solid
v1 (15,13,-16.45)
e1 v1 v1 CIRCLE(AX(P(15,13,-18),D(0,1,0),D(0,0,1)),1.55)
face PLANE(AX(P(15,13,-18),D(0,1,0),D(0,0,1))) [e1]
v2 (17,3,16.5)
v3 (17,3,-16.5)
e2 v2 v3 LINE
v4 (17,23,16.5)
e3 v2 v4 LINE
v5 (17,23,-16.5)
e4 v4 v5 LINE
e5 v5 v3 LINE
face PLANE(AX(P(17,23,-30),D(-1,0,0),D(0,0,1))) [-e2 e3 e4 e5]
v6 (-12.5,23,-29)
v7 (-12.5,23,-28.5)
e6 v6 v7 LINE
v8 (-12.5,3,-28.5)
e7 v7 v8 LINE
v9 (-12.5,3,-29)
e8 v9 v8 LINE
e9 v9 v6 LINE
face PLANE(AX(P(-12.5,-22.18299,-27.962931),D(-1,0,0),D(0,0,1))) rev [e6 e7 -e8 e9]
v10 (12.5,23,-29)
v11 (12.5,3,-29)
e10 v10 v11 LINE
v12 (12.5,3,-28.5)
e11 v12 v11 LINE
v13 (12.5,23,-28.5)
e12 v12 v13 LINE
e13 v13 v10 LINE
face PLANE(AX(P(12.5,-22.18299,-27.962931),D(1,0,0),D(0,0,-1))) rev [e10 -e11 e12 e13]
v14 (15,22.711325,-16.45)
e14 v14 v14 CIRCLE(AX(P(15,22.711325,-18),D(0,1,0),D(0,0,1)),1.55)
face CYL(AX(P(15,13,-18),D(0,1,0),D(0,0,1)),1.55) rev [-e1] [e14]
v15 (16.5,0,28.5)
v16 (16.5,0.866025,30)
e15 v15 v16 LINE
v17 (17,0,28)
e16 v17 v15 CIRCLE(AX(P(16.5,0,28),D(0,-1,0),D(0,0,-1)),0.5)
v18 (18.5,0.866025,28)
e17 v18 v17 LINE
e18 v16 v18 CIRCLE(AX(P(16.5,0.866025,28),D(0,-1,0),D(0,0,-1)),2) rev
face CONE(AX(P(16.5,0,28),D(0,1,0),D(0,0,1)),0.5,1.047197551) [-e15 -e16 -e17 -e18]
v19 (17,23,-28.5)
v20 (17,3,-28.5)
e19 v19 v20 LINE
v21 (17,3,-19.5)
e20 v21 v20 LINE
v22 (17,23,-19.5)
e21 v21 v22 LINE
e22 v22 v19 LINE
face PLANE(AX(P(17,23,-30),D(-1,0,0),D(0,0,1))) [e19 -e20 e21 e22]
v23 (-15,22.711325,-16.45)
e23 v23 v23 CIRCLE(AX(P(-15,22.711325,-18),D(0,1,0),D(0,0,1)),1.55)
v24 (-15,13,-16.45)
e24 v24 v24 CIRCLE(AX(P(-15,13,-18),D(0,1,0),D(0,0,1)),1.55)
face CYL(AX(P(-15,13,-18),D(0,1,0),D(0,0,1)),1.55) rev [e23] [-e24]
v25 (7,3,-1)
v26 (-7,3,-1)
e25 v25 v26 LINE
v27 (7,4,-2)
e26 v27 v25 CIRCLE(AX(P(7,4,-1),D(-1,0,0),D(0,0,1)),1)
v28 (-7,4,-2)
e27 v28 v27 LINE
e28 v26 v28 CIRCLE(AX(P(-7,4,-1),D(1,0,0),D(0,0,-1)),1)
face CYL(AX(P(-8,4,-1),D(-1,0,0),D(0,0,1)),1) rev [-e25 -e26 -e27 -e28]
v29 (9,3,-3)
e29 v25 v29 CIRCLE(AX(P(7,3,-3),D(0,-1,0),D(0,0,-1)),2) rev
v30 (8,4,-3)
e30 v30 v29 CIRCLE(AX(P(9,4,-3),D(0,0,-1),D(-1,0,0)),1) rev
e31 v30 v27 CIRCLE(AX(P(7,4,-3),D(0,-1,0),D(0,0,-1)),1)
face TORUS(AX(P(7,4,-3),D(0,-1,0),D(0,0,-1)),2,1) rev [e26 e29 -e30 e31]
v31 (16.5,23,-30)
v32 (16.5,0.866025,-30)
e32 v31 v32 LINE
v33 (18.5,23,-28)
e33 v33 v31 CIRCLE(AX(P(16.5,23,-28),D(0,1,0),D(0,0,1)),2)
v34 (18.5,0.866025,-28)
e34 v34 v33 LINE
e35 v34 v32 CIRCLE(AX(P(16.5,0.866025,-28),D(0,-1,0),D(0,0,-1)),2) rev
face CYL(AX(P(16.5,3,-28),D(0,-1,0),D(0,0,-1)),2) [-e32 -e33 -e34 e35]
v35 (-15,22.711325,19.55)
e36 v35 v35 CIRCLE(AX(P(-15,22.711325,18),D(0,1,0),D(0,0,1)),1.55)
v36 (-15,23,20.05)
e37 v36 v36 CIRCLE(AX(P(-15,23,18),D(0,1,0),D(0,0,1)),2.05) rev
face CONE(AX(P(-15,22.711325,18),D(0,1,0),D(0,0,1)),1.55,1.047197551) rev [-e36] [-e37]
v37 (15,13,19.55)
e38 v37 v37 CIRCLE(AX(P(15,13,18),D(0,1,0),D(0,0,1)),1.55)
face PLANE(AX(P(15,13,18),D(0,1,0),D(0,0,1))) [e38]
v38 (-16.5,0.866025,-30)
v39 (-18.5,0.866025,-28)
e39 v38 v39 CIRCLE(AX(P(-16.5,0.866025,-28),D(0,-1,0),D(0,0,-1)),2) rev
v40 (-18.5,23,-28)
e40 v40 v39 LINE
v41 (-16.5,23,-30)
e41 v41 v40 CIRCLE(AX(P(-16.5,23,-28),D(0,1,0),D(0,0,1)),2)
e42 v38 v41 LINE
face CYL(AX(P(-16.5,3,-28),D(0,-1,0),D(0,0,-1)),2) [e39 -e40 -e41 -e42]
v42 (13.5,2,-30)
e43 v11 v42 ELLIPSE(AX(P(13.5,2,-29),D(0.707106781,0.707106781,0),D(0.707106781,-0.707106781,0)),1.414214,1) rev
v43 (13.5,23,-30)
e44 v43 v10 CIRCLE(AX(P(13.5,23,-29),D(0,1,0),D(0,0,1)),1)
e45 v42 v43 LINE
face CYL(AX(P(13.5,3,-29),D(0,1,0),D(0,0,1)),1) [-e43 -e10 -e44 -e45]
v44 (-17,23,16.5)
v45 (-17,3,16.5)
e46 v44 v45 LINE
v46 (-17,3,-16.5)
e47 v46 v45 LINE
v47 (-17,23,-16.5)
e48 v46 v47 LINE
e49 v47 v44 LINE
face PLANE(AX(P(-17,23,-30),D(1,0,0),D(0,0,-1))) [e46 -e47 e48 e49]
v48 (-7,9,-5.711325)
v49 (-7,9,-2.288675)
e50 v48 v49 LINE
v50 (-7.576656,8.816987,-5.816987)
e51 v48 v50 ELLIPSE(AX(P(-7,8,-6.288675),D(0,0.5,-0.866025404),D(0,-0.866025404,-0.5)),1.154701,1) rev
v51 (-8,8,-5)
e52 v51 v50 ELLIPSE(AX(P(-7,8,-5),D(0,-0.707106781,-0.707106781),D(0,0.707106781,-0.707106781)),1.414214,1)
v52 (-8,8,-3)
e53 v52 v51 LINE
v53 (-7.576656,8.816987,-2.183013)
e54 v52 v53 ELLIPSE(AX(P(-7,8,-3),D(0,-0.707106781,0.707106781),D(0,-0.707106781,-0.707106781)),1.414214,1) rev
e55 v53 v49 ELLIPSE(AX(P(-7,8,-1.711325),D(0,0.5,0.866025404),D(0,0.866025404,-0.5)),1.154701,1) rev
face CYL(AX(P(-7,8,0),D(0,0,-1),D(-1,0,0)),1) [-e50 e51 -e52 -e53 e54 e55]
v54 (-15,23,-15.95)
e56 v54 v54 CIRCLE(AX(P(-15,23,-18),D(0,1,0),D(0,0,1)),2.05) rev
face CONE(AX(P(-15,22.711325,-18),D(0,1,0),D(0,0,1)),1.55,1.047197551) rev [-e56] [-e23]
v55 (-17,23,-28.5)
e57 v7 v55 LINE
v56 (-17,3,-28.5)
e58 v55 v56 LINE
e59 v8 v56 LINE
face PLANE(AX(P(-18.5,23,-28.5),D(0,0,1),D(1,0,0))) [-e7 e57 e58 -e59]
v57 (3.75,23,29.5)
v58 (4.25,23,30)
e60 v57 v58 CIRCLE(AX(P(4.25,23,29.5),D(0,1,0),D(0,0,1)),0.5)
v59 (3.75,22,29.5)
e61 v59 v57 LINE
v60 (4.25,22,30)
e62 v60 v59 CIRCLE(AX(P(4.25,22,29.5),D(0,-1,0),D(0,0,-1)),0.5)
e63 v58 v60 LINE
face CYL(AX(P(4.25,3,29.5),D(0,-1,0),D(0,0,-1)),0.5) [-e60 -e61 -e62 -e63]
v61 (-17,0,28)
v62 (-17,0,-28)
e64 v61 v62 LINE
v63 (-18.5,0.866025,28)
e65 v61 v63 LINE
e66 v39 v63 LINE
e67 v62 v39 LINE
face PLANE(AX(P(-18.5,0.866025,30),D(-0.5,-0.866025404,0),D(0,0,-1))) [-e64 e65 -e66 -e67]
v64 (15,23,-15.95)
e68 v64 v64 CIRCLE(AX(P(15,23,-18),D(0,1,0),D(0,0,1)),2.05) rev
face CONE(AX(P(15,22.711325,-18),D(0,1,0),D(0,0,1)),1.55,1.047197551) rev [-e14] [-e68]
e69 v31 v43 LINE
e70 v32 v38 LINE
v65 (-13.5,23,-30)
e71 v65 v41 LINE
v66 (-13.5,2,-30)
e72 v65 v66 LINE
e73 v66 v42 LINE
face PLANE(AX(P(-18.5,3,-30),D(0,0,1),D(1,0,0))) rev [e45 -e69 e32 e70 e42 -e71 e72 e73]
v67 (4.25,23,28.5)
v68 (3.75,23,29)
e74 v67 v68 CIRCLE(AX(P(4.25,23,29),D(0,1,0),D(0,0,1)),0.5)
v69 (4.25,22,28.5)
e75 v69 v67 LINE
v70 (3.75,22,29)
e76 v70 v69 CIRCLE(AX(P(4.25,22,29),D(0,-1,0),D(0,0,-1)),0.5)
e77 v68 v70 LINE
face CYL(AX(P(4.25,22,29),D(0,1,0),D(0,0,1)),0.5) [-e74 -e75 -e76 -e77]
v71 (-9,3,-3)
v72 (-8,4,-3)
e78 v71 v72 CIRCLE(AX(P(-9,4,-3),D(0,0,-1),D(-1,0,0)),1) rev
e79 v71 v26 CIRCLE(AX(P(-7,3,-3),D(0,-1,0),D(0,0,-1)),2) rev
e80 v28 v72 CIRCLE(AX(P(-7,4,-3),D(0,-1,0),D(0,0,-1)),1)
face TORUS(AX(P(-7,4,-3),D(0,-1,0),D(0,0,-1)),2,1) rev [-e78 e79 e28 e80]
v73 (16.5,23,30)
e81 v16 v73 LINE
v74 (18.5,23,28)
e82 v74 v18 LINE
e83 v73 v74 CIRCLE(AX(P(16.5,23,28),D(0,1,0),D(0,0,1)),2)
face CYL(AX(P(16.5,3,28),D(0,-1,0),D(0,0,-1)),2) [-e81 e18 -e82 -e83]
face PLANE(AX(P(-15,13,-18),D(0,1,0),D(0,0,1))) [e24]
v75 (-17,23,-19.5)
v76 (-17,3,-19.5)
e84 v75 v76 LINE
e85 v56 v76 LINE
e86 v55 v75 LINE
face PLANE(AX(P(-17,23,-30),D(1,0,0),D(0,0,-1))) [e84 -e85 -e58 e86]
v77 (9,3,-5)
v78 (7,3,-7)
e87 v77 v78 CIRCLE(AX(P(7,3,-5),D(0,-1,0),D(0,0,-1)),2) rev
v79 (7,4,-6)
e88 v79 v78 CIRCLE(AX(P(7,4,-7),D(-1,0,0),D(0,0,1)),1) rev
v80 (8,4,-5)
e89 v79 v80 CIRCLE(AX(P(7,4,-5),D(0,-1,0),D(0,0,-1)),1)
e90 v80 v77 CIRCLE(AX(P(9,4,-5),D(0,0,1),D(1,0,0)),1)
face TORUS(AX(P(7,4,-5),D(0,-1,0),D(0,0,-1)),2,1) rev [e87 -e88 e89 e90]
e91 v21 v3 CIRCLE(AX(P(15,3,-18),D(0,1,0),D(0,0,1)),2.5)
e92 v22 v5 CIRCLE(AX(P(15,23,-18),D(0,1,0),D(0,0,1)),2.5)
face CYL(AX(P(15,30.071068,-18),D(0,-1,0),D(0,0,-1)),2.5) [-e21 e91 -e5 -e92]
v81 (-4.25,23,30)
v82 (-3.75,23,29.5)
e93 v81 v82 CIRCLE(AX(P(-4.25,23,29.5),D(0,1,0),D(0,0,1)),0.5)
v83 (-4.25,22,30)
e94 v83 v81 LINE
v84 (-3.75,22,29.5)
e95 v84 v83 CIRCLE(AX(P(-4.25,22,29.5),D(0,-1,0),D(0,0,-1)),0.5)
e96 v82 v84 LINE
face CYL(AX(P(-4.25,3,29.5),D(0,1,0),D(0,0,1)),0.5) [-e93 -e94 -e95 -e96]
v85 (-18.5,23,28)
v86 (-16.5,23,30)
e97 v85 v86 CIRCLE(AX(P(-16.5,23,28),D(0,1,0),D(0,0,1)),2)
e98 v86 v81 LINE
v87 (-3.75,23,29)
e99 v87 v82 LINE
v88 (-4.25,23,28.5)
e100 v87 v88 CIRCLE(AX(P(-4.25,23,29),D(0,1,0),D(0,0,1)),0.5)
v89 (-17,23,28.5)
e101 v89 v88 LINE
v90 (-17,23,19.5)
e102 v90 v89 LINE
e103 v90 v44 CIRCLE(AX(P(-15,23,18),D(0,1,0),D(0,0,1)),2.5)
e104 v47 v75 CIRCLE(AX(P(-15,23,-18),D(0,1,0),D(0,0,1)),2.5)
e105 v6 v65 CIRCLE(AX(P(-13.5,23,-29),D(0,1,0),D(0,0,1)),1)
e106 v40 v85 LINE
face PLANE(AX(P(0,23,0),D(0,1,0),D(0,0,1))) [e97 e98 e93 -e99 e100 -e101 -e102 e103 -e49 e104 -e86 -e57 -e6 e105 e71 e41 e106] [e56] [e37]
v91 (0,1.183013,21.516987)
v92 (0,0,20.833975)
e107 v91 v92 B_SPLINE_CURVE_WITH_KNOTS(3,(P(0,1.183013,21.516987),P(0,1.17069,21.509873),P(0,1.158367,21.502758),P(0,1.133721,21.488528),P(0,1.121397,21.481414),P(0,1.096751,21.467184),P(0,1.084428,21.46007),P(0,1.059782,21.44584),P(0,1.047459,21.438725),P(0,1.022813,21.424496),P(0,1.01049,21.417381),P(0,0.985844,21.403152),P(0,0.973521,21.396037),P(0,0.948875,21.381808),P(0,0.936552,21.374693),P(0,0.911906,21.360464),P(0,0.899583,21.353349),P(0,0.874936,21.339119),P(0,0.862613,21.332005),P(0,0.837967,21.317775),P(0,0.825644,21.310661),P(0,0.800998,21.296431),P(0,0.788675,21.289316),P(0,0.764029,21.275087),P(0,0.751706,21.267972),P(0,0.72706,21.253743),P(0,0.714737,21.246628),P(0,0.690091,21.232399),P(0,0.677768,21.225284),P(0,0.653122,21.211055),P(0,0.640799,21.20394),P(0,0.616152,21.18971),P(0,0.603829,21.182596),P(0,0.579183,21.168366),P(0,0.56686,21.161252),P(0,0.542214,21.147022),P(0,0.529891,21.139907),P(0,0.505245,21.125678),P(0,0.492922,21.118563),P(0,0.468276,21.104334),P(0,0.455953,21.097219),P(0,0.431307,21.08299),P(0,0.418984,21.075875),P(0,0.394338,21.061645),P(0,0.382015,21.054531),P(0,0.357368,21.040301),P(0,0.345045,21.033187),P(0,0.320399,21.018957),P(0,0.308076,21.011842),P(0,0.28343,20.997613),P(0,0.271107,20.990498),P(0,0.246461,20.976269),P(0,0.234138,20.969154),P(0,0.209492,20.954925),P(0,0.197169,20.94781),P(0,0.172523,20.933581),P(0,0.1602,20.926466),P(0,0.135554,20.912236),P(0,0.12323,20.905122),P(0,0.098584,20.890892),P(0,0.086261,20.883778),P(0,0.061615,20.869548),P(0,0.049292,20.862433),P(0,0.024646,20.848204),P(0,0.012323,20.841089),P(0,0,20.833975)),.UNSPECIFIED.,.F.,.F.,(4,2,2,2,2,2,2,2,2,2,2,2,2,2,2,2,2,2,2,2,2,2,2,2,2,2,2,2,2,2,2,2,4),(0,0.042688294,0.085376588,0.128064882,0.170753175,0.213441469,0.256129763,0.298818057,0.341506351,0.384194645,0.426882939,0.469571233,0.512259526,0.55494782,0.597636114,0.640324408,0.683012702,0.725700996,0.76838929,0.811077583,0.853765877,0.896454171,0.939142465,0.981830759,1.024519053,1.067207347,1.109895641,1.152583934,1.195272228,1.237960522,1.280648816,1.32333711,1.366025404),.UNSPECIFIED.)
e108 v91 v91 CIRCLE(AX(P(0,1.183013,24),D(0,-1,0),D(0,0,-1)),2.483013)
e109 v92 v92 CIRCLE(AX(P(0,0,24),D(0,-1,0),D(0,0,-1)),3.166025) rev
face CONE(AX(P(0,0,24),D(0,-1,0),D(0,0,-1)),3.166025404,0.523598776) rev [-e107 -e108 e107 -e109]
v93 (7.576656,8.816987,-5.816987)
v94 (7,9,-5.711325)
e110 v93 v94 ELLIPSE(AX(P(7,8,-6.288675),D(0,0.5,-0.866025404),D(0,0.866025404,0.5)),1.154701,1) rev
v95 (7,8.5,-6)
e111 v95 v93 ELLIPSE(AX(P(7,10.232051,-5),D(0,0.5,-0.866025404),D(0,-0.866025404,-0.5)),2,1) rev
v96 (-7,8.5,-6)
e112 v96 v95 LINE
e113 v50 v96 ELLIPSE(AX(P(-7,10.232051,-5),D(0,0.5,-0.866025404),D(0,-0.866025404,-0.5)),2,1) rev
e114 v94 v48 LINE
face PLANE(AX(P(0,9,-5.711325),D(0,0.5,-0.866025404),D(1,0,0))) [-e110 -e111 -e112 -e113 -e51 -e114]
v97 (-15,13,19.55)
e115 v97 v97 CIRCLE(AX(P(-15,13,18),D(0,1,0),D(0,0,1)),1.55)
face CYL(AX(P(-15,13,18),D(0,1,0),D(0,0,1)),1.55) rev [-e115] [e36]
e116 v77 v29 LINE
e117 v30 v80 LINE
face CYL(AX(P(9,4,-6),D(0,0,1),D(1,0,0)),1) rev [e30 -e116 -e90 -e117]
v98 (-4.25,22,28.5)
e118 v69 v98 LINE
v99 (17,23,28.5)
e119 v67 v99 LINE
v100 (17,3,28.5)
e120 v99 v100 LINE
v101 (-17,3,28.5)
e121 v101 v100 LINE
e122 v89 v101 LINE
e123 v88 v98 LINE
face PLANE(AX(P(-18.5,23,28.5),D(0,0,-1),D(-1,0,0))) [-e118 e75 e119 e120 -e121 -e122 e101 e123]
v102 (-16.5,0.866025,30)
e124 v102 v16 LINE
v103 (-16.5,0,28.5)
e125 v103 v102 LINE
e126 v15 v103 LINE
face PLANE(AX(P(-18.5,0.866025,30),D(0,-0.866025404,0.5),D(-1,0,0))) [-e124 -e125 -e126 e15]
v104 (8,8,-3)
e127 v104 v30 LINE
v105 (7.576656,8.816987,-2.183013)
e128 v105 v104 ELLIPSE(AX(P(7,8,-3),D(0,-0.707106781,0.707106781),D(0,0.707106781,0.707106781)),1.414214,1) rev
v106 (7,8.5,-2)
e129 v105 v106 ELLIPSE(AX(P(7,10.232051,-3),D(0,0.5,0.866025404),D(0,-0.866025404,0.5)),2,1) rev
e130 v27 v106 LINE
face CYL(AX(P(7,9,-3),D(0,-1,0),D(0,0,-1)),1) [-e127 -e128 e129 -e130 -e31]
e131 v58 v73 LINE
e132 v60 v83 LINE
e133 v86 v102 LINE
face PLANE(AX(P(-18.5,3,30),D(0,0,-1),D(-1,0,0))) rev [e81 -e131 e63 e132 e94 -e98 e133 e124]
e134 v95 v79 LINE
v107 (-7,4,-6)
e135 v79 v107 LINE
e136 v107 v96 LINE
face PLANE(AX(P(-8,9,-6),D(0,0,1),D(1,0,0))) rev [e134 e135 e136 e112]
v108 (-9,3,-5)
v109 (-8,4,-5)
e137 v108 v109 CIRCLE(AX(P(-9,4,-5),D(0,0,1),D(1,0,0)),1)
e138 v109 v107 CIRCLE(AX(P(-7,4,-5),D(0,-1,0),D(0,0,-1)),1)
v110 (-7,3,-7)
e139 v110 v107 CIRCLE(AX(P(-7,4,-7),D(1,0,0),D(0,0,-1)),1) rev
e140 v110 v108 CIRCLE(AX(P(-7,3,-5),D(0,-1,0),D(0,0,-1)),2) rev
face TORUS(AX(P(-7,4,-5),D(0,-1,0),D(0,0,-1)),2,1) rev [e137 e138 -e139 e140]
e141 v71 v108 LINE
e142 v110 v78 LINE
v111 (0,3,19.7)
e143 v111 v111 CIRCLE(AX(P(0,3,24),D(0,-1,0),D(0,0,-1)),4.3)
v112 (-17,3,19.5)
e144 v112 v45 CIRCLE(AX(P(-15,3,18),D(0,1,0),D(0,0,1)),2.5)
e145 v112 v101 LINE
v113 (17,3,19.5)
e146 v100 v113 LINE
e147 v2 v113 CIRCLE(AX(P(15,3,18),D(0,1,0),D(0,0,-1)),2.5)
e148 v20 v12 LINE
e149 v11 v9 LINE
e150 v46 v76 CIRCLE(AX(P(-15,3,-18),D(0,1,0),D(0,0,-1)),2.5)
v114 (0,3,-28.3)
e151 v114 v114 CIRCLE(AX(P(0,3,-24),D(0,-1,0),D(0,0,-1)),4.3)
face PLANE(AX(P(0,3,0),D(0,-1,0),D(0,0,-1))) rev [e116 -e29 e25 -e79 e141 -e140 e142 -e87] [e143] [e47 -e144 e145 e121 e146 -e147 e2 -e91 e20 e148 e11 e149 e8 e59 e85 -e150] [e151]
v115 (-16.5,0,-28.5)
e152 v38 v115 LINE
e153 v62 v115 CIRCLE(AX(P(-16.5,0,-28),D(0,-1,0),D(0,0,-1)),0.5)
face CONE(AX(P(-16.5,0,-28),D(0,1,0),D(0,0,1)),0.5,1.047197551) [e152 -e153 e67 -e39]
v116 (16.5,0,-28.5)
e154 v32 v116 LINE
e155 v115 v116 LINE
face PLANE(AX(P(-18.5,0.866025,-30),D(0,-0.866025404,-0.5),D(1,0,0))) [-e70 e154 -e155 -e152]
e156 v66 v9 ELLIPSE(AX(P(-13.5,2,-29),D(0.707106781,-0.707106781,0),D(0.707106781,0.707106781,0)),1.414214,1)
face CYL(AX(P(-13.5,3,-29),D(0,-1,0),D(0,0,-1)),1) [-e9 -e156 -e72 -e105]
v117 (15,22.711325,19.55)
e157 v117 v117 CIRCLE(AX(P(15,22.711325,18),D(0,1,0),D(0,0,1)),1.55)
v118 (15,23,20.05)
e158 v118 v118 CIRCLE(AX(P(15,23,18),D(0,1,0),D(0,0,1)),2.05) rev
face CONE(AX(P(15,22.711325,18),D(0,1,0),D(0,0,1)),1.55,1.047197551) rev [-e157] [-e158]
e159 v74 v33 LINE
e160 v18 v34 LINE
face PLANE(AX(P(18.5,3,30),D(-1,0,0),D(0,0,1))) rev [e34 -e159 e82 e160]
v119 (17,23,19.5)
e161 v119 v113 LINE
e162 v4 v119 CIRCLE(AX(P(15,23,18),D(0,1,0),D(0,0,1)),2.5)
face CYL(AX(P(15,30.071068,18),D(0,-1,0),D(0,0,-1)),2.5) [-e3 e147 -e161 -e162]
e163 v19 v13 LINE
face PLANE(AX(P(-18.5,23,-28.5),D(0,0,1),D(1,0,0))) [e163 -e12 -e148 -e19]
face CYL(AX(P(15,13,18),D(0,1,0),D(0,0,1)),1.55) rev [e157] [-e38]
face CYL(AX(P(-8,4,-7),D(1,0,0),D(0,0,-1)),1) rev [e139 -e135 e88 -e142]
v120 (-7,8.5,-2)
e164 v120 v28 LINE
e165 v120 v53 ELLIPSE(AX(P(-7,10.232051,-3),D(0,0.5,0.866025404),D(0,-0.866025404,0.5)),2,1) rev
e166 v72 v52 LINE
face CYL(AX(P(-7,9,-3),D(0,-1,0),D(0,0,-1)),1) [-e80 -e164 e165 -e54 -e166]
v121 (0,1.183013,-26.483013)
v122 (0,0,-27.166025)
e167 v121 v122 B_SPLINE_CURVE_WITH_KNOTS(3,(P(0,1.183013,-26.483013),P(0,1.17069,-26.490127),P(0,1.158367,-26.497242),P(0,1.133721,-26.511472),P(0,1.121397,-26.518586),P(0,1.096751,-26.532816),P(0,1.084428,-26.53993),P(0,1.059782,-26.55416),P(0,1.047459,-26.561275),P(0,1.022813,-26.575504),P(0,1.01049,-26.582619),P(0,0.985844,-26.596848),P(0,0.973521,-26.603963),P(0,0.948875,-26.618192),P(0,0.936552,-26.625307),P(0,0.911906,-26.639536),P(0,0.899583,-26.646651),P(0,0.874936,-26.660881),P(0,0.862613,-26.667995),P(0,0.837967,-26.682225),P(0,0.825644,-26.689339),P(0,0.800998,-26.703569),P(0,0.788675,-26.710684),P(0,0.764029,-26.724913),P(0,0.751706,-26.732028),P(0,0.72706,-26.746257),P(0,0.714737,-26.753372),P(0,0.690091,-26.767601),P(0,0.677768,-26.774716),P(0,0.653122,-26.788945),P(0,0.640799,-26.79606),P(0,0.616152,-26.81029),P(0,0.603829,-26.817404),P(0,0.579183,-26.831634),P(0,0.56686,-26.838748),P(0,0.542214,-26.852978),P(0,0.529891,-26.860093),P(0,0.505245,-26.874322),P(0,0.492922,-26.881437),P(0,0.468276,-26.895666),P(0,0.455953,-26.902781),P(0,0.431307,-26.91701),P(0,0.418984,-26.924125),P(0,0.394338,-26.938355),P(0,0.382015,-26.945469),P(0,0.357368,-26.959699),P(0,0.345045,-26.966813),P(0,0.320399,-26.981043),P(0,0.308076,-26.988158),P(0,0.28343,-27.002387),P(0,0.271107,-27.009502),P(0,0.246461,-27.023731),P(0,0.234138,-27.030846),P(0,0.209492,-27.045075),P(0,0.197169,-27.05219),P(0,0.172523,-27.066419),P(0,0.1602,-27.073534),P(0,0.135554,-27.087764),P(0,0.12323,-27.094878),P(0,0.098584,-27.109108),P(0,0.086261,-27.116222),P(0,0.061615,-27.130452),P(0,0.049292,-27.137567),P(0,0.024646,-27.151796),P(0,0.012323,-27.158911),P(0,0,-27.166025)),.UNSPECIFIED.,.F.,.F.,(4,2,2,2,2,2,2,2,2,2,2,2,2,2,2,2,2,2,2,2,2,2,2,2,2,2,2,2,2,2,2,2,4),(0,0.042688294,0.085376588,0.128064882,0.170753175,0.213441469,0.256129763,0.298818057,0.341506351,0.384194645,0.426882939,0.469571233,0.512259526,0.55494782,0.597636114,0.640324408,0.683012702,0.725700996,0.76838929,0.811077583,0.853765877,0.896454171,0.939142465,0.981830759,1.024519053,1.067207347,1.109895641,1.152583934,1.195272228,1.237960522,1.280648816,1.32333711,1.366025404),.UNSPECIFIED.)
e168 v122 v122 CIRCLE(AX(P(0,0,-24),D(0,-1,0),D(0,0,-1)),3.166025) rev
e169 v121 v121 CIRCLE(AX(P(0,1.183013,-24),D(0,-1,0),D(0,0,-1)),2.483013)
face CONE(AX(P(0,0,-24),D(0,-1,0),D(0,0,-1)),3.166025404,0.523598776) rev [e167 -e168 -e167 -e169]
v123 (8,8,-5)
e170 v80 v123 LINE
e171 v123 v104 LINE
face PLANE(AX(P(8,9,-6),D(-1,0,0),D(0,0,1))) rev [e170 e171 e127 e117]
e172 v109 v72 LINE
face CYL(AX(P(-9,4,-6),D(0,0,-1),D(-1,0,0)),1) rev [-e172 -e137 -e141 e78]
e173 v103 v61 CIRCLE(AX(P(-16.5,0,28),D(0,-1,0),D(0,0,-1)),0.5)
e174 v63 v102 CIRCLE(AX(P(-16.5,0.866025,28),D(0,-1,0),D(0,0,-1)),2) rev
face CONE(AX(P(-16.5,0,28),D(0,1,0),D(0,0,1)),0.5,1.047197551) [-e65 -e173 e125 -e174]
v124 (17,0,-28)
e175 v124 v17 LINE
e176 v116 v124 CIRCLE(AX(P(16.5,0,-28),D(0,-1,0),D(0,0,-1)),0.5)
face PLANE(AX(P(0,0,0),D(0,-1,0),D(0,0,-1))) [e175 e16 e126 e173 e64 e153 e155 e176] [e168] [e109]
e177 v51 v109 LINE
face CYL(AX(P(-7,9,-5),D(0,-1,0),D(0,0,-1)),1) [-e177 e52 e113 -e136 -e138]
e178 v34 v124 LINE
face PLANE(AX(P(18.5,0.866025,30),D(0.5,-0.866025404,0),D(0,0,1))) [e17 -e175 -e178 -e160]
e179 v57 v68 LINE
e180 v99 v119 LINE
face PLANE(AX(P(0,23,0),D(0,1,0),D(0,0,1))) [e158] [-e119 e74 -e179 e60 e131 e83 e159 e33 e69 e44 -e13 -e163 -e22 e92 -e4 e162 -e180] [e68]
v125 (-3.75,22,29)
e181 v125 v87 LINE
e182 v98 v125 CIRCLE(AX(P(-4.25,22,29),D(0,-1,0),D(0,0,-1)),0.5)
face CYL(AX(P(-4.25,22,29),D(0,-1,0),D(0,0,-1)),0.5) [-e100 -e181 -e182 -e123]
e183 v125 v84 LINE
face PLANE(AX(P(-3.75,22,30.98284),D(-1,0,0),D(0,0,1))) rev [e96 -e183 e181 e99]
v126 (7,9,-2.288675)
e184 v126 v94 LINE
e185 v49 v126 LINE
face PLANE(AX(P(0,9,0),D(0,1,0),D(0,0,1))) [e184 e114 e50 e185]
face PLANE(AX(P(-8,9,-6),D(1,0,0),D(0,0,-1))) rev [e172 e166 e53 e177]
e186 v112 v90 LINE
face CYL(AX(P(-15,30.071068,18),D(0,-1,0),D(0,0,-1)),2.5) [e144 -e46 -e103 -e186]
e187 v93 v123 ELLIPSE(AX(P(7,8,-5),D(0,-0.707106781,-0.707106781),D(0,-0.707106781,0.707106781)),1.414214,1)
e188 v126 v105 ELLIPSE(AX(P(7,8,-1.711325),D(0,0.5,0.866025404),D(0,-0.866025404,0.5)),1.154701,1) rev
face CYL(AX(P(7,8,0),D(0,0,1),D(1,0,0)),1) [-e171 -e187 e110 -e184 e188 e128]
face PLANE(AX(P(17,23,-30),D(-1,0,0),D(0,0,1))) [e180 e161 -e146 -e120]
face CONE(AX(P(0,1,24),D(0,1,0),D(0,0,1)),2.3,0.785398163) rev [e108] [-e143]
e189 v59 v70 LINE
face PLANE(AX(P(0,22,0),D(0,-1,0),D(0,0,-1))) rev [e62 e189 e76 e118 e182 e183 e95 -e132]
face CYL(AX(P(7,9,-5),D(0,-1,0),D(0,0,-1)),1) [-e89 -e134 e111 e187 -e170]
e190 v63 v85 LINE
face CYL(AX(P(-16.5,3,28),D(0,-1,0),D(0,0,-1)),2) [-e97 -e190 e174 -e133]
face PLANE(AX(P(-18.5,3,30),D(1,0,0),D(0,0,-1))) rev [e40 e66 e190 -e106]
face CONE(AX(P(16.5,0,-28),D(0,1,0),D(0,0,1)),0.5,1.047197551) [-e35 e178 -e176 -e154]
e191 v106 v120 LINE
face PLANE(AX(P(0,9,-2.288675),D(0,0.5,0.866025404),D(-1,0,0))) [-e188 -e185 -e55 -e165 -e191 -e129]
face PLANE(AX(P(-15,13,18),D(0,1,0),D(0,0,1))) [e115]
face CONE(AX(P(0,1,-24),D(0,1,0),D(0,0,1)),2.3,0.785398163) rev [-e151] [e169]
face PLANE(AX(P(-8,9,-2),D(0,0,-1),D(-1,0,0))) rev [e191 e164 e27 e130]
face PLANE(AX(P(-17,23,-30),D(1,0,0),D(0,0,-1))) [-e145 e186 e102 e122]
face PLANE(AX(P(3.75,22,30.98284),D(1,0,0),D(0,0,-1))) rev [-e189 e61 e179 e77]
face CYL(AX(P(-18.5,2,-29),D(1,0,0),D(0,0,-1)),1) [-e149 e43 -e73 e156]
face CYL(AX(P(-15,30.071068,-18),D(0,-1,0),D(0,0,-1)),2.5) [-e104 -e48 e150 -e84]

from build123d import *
from OCP.BRepFilletAPI import BRepFilletAPI_MakeChamfer

# Parameters (mm, degrees)
SKETCH_1_W          = 37
SKETCH_1_H          = 60
SKETCH_1_R          = 2.3
EXTRUDE_1_DEPTH     = 3
CHAMFER_1_SIZE      = 2
SKETCH_2_W          = 37
SKETCH_2_H          = 60
SKETCH_2_W_2        = 34
SKETCH_2_H_2        = 57
EXTRUDE_1_2_DEPTH   = 20
SKETCH_3_W          = 25
SKETCH_3_H          = 3.030341357
CUT_EXTRUDE_1_DEPTH = 20
SKETCH_4_R          = 2.5
EXTRUDE_2_DEPTH     = 20
SKETCH_5_R          = 1.55
CUT_EXTRUDE_2_DEPTH = 10
SKETCH_6_W          = 16
SKETCH_6_H          = 4
EXTRUDE_3_DEPTH     = 6
SKETCH_7_W          = 7.5
SKETCH_7_H          = 4.667229269
CUT_EXTRUDE_3_DEPTH = 1
FILLET_2_R          = 0.5
FILLET_3_R          = 2
CHAMFER_4_SIZE      = 0.866025404
CHAMFER_4_SIZE_2    = 1.5
FILLET_4_R          = 1
CHAMFER_5_SIZE      = 0.5
CHAMFER_5_SIZE_2    = 0.288675135
CHAMFER_6_SIZE      = 0.5
CHAMFER_6_SIZE2     = 0.288675135
FILLET_5_R          = 1


with BuildPart() as part:
    # Эскиз1 → Extrude 1 (new body)
    with BuildSketch(Plane(origin=(0, 0, 0), x_dir=(1, 0, 0), z_dir=(0, 1, 0))):
        Rectangle(SKETCH_1_W, SKETCH_1_H)
        with Locations(Location((0, 24, 0), (0, 0, 270))):
            Circle(SKETCH_1_R, mode=Mode.SUBTRACT)
        with Locations(Location((0, -24, 0), (0, 0, 270))):
            Circle(SKETCH_1_R, mode=Mode.SUBTRACT)
    extrude(amount=EXTRUDE_1_DEPTH)

    # Фаска1
    chamfer_1_edges = [part.edges().sort_by_distance(p)[0] for p in [
        (0, 3, -26.3),
        (0, 3, 21.7),
    ]]
    chamfer(chamfer_1_edges, length=CHAMFER_1_SIZE)

    # Эскиз2 → Extrude 1 2 (add)
    with BuildSketch(Plane(origin=(0, 3, 0), x_dir=(1, 0, 0), z_dir=(0, 1, 0))):
        Rectangle(SKETCH_2_W, SKETCH_2_H)
        Rectangle(SKETCH_2_W_2, SKETCH_2_H_2, mode=Mode.SUBTRACT)
    extrude(amount=EXTRUDE_1_2_DEPTH)

    # Эскиз3 → Вырез-Вытянуть1 (cut)
    with BuildSketch(Plane(origin=(0, 23, 0), x_dir=(1, 0, 0), z_dir=(0, 1, 0))):
        with Locations((0, 29.478101209)):
            Rectangle(SKETCH_3_W, SKETCH_3_H)
    extrude(amount=-CUT_EXTRUDE_1_DEPTH, mode=Mode.SUBTRACT)

    # Эскиз4 → Бобышка-Вытянуть2 (add)
    with BuildSketch(Plane(origin=(0, 3, 0), x_dir=(1, 0, 0), z_dir=(0, 1, 0))):
        with Locations((15, 18)):
            Circle(SKETCH_4_R)
        with Locations((-15, 18)):
            Circle(SKETCH_4_R)
        with Locations((15, -18)):
            Circle(SKETCH_4_R)
        with Locations((-15, -18)):
            Circle(SKETCH_4_R)
    extrude(amount=EXTRUDE_2_DEPTH)

    # Эскиз5 → Вырез-Вытянуть2 (cut)
    with BuildSketch(Plane(origin=(0, 23, 0), x_dir=(1, 0, 0), z_dir=(0, 1, 0))):
        with Locations(Location((15, 18, 0), (0, 0, 270))):
            Circle(SKETCH_5_R)
        with Locations(Location((15, -18, 0), (0, 0, 270))):
            Circle(SKETCH_5_R)
        with Locations(Location((-15, -18, 0), (0, 0, 270))):
            Circle(SKETCH_5_R)
        with Locations(Location((-15, 18, 0), (0, 0, 270))):
            Circle(SKETCH_5_R)
    extrude(amount=-CUT_EXTRUDE_2_DEPTH, mode=Mode.SUBTRACT)

    # Эскиз6 → Бобышка-Вытянуть3 (add)
    with BuildSketch(Plane(origin=(0, 3, 0), x_dir=(1, 0, 0), z_dir=(0, 1, 0))):
        with Locations((0, 4)):
            Rectangle(SKETCH_6_W, SKETCH_6_H)
    extrude(amount=EXTRUDE_3_DEPTH)

    # Эскиз7 → Вырез-Вытянуть3 (cut)
    with BuildSketch(Plane(origin=(0, 23, 0), x_dir=(1, 0, 0), z_dir=(0, 1, 0))):
        with Locations((0, -28.649225697)):
            Rectangle(SKETCH_7_W, SKETCH_7_H)
    extrude(amount=-CUT_EXTRUDE_3_DEPTH, mode=Mode.SUBTRACT)

    # Скругление2
    fillet_2_edges = [part.edges().sort_by_distance(p)[0] for p in [
        (-3.75, 22.5, 28.5),
        (3.75, 22.5, 28.5),
        (3.75, 22.5, 30),
        (-3.75, 22.5, 30),
    ]]
    fillet(fillet_2_edges, radius=FILLET_2_R)

    # Скругление3
    fillet_3_edges = [part.edges().sort_by_distance(p)[0] for p in [
        (18.5, 11.5, 30),
        (-18.5, 11.5, 30),
        (-18.5, 11.5, -30),
        (18.5, 11.5, -30),
    ]]
    fillet(fillet_3_edges, radius=FILLET_3_R)

    # Фаска4
    # the kernel refuses this chamfer: 1.5, 0.866025404 mm, written as the material it takes off along each edge
    with BuildSketch(Plane(origin=(0, 0, 24), x_dir=(0, 0, 1), z_dir=(-1, 0, 0))) as chamfer_4_piece_1:
        Polygon((2.3 + CHAMFER_4_SIZE, 0), (2.3, CHAMFER_4_SIZE_2), (2.3, 0), align=None)
    revolve(axis=Axis((0, 0, 24), (0, 1, 0)), mode=Mode.SUBTRACT)
    with BuildSketch(Plane(origin=(16.5, 0, -30), x_dir=(0, -0.01932676561270073, 0.999813220622208), z_dir=(-1, 0, 0))) as chamfer_4_piece_2:
        Polygon((CHAMFER_4_SIZE_2 * 0.999813220622, CHAMFER_4_SIZE_2 * 0.0193267656127), (-CHAMFER_4_SIZE * 0.0193267656079, CHAMFER_4_SIZE * 0.999813220373), (0, 0), align=None)
    extrude(amount=33, mode=Mode.SUBTRACT)
    with BuildSketch(Plane(origin=(-18.5, 0, -28), x_dir=(0.999813220622208, -0.01932676561270073, 0), z_dir=(0, 0, 1)), Plane(origin=(18.5, 0, 28), x_dir=(-0.999813220622208, -0.01932676561270073, 0), z_dir=(0, 0, -1))) as chamfer_4_piece_3:
        Polygon((CHAMFER_4_SIZE_2 * 0.999813220622, CHAMFER_4_SIZE_2 * 0.0193267656127), (-CHAMFER_4_SIZE * 0.0193267656079, CHAMFER_4_SIZE * 0.999813220373), (0, 0), align=None)
    extrude(amount=56, mode=Mode.SUBTRACT)
    with BuildSketch(Plane(origin=(-16.5, 0, 30), x_dir=(0, 0.9983227437537924, 0.0578938624026721), z_dir=(1, 0, 0))) as chamfer_4_piece_4:
        Polygon((CHAMFER_4_SIZE * 0.998322743505, -CHAMFER_4_SIZE * 0.0578938623883), (-CHAMFER_4_SIZE_2 * 0.0578938624027, -CHAMFER_4_SIZE_2 * 0.998322743754), (0, 0), align=None)
    extrude(amount=33, mode=Mode.SUBTRACT)
    with BuildSketch(Plane(origin=(-16.5, 0, -28), x_dir=(0, 0, -1), z_dir=(1, 0, 0))) as chamfer_4_piece_5:
        Polygon((2 - CHAMFER_4_SIZE_2, 0), (2, CHAMFER_4_SIZE), (2, 0), align=None)
    revolve(axis=Axis((-16.5, 0, -28), (0, 1, 0)), revolution_arc=90, mode=Mode.SUBTRACT)
    with BuildSketch(Plane(origin=(-16.5, 0, 28), x_dir=(0, 0, 1), z_dir=(1, 0, 0))) as chamfer_4_piece_6:
        Polygon((2 - CHAMFER_4_SIZE_2, 0), (2, -CHAMFER_4_SIZE), (2, 0), align=None)
    revolve(axis=Axis((-16.5, 0, 28), (0, -1, 0)), revolution_arc=90, mode=Mode.SUBTRACT)
    with BuildSketch(Plane(origin=(16.5, 0, 28), x_dir=(0, 0, 1), z_dir=(-1, 0, 0))) as chamfer_4_piece_7:
        Polygon((2, CHAMFER_4_SIZE), (2 - CHAMFER_4_SIZE_2, 0), (2, 0), align=None)
    revolve(axis=Axis((16.5, 0, 28), (0, 1, 0)), revolution_arc=90, mode=Mode.SUBTRACT)
    with BuildSketch(Plane(origin=(16.5, 0, -28), x_dir=(0, 0, -1), z_dir=(-1, 0, 0))) as chamfer_4_piece_8:
        Polygon((2 - CHAMFER_4_SIZE_2, 0), (2, -CHAMFER_4_SIZE), (2, 0), align=None)
    revolve(axis=Axis((16.5, 0, -28), (0, -1, 0)), revolution_arc=90, mode=Mode.SUBTRACT)
    with BuildSketch(Plane(origin=(0, 0, -24), x_dir=(0, 0, 1), z_dir=(-1, 0, 0))) as chamfer_4_piece_9:
        Polygon((2.3 + CHAMFER_4_SIZE, 0), (2.3, CHAMFER_4_SIZE_2), (2.3, 0), align=None)
    revolve(axis=Axis((0, 0, -24), (0, 1, 0)), mode=Mode.SUBTRACT)

    # Скругление4
    fillet_4_edges = [part.edges().sort_by_distance(p)[0] for p in [
        (-8, 3, -4),
        (-8, 6, -6),
        (0, 3, -2),
        (-8, 6, -2),
        (8, 3, -4),
        (8, 6, -2),
        (0, 3, -6),
        (8, 6, -6),
        (-8, 9, -4),
        (8, 9, -4),
    ]]
    fillet(fillet_4_edges, radius=FILLET_4_R)

    # Фаска5
    # the kernel refuses this chamfer: 0.5, 0.288675135 mm, written as the material it takes off along each edge
    with BuildSketch(Plane(origin=(-8.293542877, 9, -6), x_dir=(0, -0.9998132206222079, -0.019326765612700324), z_dir=(1, 0, 0)), Plane(origin=(8.293542877, 9, -2), x_dir=(0, -0.9998132206222079, 0.01932676561270075), z_dir=(-1, 0, 0))) as chamfer_5_piece_1:
        Polygon((CHAMFER_5_SIZE * 0.999813220622, -CHAMFER_5_SIZE * 0.0193267656127), (-CHAMFER_5_SIZE_2 * 0.0193267655856, -CHAMFER_5_SIZE_2 * 0.999813219219), (0, 0), align=None)
    extrude(amount=16.587085755, mode=Mode.SUBTRACT)

    # Фаска6: one chamfer whose edges measure the first distance from different faces: ONE call of the kernel's chamfer builder (chamfer() names one face for all edges)
    chamfer_6_edges_1 = [part.edges().sort_by_distance(p)[0] for p in [
        (-15, 23, -19.55),
        (-15, 23, 16.45),
    ]]
    chamfer_6_side_1 = [part.faces().sort_by_distance(p)[0] for p in [
        (-10.375, 23, 29.382135735),
    ]]
    chamfer_6_edges_2 = [part.edges().sort_by_distance(p)[0] for p in [
        (15, 23, 16.45),
        (15, 23, -19.55),
    ]]
    chamfer_6_side_2 = [part.faces().sort_by_distance(p)[0] for p in [
        (10.375, 23, 29.382135735),
    ]]
    chamfer_6 = BRepFilletAPI_MakeChamfer(part.part.solid().wrapped)
    for e in chamfer_6_edges_1:
        chamfer_6.Add(CHAMFER_6_SIZE, CHAMFER_6_SIZE2, e.wrapped, chamfer_6_side_1[0].wrapped)  # the first distance lies on this face
    for e in chamfer_6_edges_2:
        chamfer_6.Add(CHAMFER_6_SIZE, CHAMFER_6_SIZE2, e.wrapped, chamfer_6_side_2[0].wrapped)  # the first distance lies on this face
    add(Compound.cast(chamfer_6.Shape()), mode=Mode.REPLACE)

    # Скругление5
    fillet_5_edges = [part.edges().sort_by_distance(p)[0] for p in [
        (0, 3, -30),
        (-12.5, 13, -30),
        (12.5, 13, -30),
    ]]
    fillet(fillet_5_edges, radius=FILLET_5_R)


solid = part.part
